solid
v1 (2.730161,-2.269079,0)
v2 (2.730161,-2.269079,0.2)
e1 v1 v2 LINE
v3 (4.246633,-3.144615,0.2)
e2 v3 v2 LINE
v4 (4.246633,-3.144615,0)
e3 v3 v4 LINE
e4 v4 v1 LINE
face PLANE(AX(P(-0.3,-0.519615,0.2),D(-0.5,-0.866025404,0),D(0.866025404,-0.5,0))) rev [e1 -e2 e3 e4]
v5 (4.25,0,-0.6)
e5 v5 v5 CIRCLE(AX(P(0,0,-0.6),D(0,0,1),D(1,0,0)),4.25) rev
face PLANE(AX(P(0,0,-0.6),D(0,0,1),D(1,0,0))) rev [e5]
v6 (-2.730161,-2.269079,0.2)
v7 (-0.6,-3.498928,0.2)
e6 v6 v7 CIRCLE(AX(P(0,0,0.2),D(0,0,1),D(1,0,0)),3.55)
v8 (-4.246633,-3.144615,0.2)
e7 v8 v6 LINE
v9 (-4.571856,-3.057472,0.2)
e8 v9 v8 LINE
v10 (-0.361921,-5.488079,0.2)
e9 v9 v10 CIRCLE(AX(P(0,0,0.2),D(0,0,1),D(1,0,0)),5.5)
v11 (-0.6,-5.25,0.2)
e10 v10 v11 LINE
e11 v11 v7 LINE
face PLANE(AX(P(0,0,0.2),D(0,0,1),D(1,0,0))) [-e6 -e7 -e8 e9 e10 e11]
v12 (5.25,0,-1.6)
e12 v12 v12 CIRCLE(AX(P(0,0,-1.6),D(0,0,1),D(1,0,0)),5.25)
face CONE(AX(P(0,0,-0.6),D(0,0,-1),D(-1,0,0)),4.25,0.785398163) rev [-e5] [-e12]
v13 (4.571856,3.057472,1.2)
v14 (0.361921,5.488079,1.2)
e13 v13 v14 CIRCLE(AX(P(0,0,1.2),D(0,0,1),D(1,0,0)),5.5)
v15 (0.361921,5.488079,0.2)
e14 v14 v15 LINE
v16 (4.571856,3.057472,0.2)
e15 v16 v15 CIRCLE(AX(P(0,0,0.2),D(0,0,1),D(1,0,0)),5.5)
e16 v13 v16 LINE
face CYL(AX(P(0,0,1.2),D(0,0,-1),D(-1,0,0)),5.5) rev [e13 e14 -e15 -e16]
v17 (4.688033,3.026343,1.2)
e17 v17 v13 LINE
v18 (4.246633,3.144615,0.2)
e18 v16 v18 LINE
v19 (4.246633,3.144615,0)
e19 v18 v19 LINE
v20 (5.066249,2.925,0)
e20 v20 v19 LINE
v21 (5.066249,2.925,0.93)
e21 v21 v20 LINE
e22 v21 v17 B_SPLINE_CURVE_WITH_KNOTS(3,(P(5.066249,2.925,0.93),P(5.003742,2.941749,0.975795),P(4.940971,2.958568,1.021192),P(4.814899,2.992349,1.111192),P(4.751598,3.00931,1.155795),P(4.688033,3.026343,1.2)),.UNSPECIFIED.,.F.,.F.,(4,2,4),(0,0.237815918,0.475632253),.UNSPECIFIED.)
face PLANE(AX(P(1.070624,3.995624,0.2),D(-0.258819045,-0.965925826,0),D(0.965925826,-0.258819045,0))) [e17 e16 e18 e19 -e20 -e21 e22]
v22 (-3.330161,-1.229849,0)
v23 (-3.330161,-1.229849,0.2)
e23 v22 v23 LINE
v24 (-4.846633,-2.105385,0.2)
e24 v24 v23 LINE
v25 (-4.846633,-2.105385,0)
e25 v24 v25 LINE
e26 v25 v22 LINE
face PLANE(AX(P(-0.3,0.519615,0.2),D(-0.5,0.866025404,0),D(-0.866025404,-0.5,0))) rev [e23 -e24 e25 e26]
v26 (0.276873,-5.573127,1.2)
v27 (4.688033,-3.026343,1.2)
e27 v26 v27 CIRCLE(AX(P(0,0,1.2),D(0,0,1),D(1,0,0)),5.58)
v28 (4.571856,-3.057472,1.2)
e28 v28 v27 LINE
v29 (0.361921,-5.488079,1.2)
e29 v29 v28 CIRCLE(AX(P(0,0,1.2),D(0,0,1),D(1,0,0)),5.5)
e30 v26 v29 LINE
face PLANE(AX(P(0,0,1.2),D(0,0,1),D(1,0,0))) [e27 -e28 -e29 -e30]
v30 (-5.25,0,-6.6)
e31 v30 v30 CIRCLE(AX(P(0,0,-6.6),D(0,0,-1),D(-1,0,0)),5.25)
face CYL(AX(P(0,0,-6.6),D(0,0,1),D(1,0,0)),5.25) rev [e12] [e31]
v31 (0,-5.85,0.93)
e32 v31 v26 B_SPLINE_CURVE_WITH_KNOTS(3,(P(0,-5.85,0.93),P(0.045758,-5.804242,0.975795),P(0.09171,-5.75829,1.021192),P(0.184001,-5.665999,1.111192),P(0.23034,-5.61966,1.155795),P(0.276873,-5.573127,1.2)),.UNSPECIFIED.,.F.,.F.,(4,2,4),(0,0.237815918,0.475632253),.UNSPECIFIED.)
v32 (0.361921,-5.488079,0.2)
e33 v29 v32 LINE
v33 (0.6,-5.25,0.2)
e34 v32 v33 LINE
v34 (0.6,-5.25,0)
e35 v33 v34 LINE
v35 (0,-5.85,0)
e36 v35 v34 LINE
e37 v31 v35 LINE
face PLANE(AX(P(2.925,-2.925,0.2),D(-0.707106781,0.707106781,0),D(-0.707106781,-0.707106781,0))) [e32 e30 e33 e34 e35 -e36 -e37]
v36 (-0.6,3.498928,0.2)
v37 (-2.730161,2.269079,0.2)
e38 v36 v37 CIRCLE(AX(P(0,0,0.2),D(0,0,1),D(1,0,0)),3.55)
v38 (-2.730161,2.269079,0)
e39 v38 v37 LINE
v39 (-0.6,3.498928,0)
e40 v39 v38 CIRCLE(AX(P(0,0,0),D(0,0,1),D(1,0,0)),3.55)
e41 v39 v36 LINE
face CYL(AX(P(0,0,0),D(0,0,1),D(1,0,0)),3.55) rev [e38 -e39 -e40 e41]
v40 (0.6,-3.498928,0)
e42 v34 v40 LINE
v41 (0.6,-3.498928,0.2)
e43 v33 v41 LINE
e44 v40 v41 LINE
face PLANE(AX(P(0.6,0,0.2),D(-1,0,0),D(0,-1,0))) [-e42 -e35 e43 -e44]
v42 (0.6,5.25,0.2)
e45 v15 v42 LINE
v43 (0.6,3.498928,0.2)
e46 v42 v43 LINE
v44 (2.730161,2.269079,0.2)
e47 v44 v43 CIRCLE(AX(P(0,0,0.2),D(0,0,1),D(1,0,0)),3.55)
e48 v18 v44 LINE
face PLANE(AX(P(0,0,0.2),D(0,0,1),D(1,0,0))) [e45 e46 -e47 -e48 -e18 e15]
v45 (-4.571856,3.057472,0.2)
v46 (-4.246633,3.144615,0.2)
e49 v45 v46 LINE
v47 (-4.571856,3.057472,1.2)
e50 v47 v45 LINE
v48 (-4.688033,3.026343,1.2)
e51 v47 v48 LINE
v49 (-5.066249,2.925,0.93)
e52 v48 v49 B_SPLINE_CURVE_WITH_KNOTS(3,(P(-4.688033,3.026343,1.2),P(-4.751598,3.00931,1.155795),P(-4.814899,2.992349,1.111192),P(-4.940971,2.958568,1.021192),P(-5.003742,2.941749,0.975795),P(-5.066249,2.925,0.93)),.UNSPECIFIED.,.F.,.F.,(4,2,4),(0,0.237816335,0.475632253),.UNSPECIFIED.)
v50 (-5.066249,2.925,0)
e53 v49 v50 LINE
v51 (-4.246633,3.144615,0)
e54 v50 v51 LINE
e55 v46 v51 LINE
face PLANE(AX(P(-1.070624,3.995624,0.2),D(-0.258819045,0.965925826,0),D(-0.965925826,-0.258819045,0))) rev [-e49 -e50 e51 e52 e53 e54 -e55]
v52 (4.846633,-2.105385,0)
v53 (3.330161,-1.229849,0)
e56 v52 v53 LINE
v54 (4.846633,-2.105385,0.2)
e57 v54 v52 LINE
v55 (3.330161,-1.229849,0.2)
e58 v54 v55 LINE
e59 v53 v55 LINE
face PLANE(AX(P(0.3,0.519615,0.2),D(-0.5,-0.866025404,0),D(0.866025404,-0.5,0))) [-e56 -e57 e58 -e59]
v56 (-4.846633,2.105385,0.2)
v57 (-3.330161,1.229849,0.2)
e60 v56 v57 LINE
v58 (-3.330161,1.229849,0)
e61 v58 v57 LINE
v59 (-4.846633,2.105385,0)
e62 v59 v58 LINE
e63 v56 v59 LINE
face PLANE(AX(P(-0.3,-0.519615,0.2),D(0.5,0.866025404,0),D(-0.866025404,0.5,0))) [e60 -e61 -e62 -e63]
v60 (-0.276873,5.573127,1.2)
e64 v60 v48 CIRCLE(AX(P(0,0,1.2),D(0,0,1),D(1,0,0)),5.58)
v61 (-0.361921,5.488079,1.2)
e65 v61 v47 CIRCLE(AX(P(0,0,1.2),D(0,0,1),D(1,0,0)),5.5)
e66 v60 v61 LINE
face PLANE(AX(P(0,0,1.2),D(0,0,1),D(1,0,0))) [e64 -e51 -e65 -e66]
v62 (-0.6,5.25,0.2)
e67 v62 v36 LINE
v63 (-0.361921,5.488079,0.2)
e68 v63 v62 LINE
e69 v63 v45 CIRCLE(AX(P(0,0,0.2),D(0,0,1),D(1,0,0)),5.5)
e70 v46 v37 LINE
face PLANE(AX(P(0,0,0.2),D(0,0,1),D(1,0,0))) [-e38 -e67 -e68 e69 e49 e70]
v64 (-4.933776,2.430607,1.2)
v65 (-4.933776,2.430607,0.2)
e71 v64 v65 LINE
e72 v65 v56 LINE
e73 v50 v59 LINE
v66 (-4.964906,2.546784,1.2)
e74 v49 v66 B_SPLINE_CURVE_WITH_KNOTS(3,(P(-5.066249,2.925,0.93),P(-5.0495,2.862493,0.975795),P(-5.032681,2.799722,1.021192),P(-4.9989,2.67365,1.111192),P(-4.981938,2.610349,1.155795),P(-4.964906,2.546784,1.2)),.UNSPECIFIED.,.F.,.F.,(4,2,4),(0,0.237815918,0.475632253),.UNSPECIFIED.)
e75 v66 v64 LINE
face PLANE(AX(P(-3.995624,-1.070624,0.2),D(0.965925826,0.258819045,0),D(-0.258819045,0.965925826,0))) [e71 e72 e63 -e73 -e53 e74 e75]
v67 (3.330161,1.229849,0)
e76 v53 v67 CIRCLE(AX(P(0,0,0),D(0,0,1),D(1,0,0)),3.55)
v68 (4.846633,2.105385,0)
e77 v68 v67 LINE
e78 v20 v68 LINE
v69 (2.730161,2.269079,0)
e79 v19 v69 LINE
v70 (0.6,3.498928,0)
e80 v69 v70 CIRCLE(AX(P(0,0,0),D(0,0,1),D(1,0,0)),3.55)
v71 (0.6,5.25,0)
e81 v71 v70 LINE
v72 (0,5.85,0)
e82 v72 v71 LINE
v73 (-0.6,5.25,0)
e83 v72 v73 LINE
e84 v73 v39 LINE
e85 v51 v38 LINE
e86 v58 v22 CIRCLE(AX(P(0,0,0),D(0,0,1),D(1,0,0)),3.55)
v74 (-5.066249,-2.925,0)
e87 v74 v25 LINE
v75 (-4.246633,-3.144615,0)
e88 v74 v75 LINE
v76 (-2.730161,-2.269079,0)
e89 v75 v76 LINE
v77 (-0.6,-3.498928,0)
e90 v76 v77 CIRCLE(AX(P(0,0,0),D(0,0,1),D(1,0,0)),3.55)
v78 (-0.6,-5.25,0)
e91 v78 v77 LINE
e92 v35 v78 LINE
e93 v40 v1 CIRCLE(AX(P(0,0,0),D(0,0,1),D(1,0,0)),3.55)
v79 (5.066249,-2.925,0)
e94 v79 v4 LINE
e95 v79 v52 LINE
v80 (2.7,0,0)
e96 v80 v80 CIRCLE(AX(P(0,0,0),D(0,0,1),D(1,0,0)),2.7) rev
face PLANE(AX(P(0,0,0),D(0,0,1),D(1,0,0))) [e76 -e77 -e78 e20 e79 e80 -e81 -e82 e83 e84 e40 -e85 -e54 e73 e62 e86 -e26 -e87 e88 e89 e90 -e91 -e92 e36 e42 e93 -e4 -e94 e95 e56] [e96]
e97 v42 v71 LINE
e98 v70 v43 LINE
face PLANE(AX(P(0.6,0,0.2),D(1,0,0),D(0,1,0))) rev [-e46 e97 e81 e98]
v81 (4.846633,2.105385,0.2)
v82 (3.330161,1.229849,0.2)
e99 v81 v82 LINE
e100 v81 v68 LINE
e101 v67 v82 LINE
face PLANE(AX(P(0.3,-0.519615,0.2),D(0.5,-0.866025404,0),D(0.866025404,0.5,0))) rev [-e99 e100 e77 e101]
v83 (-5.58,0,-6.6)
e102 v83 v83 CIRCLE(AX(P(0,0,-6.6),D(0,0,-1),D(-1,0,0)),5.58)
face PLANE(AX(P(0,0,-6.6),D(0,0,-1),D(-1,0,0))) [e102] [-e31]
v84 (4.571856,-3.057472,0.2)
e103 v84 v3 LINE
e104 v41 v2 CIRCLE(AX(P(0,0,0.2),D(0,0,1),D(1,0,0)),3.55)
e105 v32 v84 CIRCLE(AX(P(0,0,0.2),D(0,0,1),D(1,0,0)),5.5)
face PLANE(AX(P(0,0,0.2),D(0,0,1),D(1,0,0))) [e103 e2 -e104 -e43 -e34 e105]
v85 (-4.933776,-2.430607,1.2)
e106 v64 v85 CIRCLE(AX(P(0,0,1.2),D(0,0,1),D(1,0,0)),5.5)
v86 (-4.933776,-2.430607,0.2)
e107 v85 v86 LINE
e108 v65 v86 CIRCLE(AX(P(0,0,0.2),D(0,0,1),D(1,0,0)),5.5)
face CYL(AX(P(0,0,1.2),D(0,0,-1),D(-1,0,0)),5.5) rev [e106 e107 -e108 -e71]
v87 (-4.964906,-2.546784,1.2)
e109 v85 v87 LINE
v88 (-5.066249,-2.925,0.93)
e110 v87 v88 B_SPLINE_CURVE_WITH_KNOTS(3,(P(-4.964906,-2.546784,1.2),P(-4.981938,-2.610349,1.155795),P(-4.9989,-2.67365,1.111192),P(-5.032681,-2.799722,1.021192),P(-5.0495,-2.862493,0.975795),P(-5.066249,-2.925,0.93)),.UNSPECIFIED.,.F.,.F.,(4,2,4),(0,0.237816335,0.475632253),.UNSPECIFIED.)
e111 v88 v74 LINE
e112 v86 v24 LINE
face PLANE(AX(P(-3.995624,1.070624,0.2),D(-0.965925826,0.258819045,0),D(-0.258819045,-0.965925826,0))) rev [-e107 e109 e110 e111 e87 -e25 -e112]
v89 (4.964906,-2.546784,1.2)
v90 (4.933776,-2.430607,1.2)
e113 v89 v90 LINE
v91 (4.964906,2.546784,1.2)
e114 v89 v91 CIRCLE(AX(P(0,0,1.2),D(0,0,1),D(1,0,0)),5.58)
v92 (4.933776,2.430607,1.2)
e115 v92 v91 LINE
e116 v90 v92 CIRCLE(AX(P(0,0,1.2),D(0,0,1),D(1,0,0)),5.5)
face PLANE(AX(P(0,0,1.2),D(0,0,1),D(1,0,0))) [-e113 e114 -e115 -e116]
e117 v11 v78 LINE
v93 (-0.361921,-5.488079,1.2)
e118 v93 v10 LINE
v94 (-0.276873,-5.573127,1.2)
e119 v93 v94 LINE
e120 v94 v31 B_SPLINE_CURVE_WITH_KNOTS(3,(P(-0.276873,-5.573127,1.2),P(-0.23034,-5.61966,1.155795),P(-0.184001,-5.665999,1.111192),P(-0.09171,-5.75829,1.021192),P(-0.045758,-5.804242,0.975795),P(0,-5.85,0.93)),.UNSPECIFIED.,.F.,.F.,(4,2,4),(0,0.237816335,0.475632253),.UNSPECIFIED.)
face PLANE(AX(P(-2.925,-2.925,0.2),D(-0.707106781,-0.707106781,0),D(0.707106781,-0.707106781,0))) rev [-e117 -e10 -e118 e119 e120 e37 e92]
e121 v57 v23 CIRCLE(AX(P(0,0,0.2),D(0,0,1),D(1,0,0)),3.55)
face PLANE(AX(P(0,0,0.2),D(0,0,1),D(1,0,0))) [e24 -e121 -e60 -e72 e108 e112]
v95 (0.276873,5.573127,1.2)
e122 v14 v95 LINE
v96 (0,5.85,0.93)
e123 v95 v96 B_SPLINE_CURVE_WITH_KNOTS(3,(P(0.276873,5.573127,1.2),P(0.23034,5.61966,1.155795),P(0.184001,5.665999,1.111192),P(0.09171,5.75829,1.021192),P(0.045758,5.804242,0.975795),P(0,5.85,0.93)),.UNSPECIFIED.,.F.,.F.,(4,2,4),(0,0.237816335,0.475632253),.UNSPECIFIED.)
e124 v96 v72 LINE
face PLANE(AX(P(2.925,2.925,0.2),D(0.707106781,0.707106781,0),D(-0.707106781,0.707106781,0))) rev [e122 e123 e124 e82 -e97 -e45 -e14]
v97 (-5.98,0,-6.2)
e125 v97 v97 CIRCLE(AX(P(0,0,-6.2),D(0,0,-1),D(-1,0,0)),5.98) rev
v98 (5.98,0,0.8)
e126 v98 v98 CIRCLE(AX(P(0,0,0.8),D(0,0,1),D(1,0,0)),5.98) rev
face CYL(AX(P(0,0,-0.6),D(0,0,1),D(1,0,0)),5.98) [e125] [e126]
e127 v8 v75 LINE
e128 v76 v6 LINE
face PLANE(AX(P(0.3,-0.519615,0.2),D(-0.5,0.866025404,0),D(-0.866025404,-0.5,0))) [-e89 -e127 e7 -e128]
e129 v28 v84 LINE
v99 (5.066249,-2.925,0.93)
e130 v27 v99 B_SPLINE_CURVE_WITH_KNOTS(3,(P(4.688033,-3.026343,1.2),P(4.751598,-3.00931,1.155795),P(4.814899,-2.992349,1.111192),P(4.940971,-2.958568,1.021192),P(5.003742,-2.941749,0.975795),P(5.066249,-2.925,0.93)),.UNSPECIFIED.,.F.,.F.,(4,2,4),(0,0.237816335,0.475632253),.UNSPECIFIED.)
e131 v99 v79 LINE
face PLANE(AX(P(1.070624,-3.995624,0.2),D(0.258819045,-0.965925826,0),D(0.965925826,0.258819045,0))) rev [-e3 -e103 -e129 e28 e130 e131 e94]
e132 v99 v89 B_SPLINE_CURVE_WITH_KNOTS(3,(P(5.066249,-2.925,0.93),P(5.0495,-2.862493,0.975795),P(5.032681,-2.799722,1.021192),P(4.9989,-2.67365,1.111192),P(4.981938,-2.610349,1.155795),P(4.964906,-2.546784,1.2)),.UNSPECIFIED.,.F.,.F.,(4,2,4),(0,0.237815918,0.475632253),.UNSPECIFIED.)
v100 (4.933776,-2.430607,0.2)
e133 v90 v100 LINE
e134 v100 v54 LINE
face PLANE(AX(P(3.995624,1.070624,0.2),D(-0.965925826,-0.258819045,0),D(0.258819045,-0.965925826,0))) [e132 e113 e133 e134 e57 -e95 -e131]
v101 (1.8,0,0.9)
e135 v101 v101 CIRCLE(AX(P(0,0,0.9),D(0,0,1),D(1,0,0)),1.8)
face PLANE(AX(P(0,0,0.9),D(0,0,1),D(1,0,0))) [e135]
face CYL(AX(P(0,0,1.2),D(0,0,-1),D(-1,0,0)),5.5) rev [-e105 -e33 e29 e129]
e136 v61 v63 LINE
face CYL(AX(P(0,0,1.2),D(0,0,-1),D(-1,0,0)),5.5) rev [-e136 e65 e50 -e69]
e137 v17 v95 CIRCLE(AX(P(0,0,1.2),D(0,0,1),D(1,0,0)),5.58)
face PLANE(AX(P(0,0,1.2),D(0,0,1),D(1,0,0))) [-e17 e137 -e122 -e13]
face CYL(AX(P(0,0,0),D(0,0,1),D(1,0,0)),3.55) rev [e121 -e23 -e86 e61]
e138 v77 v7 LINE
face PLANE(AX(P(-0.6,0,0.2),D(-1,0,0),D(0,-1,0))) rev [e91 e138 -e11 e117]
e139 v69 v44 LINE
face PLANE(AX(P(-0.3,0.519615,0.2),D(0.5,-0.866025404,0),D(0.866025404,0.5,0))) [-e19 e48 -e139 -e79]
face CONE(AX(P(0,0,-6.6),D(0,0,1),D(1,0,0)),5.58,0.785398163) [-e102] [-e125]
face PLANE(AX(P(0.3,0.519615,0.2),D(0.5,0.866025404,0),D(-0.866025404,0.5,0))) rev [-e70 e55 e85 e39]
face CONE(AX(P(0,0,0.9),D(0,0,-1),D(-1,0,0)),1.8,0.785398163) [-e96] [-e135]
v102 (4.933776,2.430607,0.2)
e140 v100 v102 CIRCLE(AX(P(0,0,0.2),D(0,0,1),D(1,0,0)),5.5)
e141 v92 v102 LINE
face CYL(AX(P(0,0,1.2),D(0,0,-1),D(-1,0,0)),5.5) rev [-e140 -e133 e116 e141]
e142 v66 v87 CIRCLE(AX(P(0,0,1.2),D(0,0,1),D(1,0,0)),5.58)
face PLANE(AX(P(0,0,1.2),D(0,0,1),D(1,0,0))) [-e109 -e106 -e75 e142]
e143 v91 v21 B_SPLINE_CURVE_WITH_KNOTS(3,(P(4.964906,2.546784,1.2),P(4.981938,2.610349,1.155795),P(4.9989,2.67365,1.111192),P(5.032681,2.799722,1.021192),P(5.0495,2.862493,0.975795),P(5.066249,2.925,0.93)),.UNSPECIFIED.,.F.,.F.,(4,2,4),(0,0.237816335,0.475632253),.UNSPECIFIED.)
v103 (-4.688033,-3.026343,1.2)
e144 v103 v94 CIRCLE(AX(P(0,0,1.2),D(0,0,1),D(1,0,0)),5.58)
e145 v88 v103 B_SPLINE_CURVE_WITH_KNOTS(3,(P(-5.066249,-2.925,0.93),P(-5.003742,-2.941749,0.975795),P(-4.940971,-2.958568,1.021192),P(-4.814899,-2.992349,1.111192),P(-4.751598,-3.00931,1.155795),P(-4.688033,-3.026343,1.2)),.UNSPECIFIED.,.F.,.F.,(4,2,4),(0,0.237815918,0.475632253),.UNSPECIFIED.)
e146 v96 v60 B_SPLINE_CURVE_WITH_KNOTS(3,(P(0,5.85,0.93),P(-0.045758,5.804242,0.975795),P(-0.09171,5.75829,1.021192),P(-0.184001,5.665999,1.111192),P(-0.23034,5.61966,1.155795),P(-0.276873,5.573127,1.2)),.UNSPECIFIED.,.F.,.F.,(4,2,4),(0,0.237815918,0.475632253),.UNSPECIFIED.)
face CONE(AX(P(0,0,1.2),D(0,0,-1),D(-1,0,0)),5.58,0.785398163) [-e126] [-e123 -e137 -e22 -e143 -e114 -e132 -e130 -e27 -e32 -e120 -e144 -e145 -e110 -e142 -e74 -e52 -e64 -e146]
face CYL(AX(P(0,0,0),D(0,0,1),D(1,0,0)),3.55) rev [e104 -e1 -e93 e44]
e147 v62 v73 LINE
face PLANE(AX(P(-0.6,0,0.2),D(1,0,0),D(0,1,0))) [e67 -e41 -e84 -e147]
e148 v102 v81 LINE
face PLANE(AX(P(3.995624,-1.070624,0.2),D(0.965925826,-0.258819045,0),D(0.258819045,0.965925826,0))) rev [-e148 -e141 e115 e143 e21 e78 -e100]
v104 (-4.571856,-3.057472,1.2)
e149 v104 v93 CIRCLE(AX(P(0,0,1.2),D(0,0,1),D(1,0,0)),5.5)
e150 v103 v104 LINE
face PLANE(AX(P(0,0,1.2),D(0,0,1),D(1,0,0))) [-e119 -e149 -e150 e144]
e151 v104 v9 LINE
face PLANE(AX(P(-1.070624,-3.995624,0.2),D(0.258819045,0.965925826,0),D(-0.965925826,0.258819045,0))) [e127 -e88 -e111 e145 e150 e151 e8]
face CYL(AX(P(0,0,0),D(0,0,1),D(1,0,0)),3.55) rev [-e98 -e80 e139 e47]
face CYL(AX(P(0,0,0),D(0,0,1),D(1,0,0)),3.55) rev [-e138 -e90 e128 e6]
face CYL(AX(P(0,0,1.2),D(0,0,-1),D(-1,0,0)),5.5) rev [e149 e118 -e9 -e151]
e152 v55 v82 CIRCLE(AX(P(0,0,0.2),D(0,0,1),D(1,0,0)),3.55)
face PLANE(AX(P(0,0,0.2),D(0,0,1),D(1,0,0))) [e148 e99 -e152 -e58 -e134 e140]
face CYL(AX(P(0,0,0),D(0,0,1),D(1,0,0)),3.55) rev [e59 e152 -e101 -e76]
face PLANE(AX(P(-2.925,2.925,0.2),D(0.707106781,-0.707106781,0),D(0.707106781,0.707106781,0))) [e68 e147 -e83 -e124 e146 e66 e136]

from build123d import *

# Parameters (mm, degrees)
SKETCH_1_R          = 5.98
EXTRUDE_1_DEPTH     = 0.2
SKETCH_2_R          = 2.8
EXTRUDE_2_DEPTH     = 0.9
SKETCH_3_R          = 5.98
EXTRUDE_3_DEPTH     = 1
EXTRUDE_START       = -0.6
SKETCH_4_R          = 5.98
EXTRUDE_4_DEPTH     = 0.6
CUT_EXTRUDE_START   = -0.2
SKETCH_6_R          = 3.55
SKETCH_6_R_2        = 2.8
CUT_EXTRUDE_2_DEPTH = 0.2
EXTRUDE_START_2     = 6
SKETCH_7_R          = 5.98
SKETCH_7_R_2        = 5.25
EXTRUDE_5_DEPTH     = 6
CHAMFER_4_SIZE      = 1
CHAMFER_5_SIZE      = 0.4
CHAMFER_6_SIZE      = 0.4
CHAMFER_7_SIZE      = 1


with BuildPart() as part:
    # 스케치1 → 보스-돌출1 (new body)
    with BuildSketch(Plane.XY):
        Circle(SKETCH_1_R)
        with BuildLine():
            Line((-0.6, 5.25), (0, 5.85))
            Line((0, 5.85), (0.6, 5.25))
            Line((0.6, 5.25), (0.6, 1.670516387))
            ThreePointArc((0.6, 1.670516387), (0.8875, 1.537195092), (1.146709629, 1.354873436))
            Line((1.146709629, 1.354873436), (4.24663337, 3.144615242))
            Line((4.24663337, 3.144615242), (5.066248612, 2.925))
            Line((5.066248612, 2.925), (4.84663337, 2.105384758))
            Line((4.84663337, 2.105384758), (1.746709629, 0.315642951))
            ThreePointArc((1.746709629, 0.315642951), (1.76791326, 0.158454108), (1.775, 0))
            ThreePointArc((1.775, 0), (1.76791326, -0.158454108), (1.746709629, -0.315642951))
            Line((1.746709629, -0.315642951), (4.84663337, -2.105384758))
            Line((4.84663337, -2.105384758), (5.066248612, -2.925))
            Line((5.066248612, -2.925), (4.24663337, -3.144615242))
            Line((4.24663337, -3.144615242), (1.146709629, -1.354873436))
            ThreePointArc((1.146709629, -1.354873436), (0.8875, -1.537195092), (0.6, -1.670516387))
            Line((0.6, -1.670516387), (0.6, -5.25))
            Line((0.6, -5.25), (0, -5.85))
            Line((0, -5.85), (-0.6, -5.25))
            Line((-0.6, -5.25), (-0.6, -1.670516387))
            ThreePointArc((-0.6, -1.670516387), (-0.8875, -1.537195092), (-1.146709629, -1.354873436))
            Line((-1.146709629, -1.354873436), (-4.24663337, -3.144615242))
            Line((-4.24663337, -3.144615242), (-5.066248612, -2.925))
            Line((-5.066248612, -2.925), (-4.84663337, -2.105384758))
            Line((-4.84663337, -2.105384758), (-1.746709629, -0.315642951))
            ThreePointArc((-1.746709629, -0.315642951), (-1.775, 0), (-1.746709629, 0.315642951))
            Line((-1.746709629, 0.315642951), (-4.84663337, 2.105384758))
            Line((-4.84663337, 2.105384758), (-5.066248612, 2.925))
            Line((-5.066248612, 2.925), (-4.24663337, 3.144615242))
            Line((-4.24663337, 3.144615242), (-1.146709629, 1.354873436))
            ThreePointArc((-1.146709629, 1.354873436), (-0.8875, 1.537195092), (-0.6, 1.670516387))
            Line((-0.6, 1.670516387), (-0.6, 5.25))
        make_face(mode=Mode.SUBTRACT)
    extrude(amount=EXTRUDE_1_DEPTH)

    # 스케치3 → 보스-돌출3 (add)
    with BuildSketch(Plane.XY.offset(0.2)):
        Circle(SKETCH_3_R)
        with BuildLine():
            Line((-4.933776406, -2.430606997), (-5.066248612, -2.925))
            Line((-5.066248612, -2.925), (-4.571855609, -3.057472206))
            ThreePointArc((-4.571855609, -3.057472206), (-2.75, -4.763139721), (-0.361920797, -5.488079203))
            Line((-0.361920797, -5.488079203), (0, -5.85))
            Line((0, -5.85), (0.361920797, -5.488079203))
            ThreePointArc((0.361920797, -5.488079203), (2.75, -4.763139721), (4.571855609, -3.057472206))
            Line((4.571855609, -3.057472206), (5.066248612, -2.925))
            Line((5.066248612, -2.925), (4.933776406, -2.430606997))
            ThreePointArc((4.933776406, -2.430606997), (5.5, 0), (4.933776406, 2.430606997))
            Line((4.933776406, 2.430606997), (5.066248612, 2.925))
            Line((5.066248612, 2.925), (4.571855609, 3.057472206))
            ThreePointArc((4.571855609, 3.057472206), (2.75, 4.763139721), (0.361920797, 5.488079203))
            Line((0.361920797, 5.488079203), (0, 5.85))
            Line((0, 5.85), (-0.361920797, 5.488079203))
            ThreePointArc((-0.361920797, 5.488079203), (-2.75, 4.763139721), (-4.571855609, 3.057472206))
            Line((-4.571855609, 3.057472206), (-5.066248612, 2.925))
            Line((-5.066248612, 2.925), (-4.933776406, 2.430606997))
            ThreePointArc((-4.933776406, 2.430606997), (-5.5, 0), (-4.933776406, -2.430606997))
        make_face(mode=Mode.SUBTRACT)
    extrude(amount=EXTRUDE_3_DEPTH)



with BuildPart() as body_2:
    # 스케치2 → 보스-돌출2 (new body)
    with BuildSketch(Plane.XY):
        Circle(SKETCH_2_R)
    extrude(amount=EXTRUDE_2_DEPTH)


with BuildPart() as part_1:
    add(part.part)

    add(body_2.part)  # 보스-돌출4 merges body 2
    # 스케치4 → 보스-돌출4 (add)
    with BuildSketch(Plane.XY.offset(EXTRUDE_START)):
        Circle(SKETCH_4_R)
    extrude(amount=EXTRUDE_4_DEPTH)

    # 스케치6 → 컷-돌출2 (cut)
    with BuildSketch(Plane.XY.offset(0.2).offset(CUT_EXTRUDE_START)):
        Circle(SKETCH_6_R)
        Circle(SKETCH_6_R_2, mode=Mode.SUBTRACT)
    extrude(amount=CUT_EXTRUDE_2_DEPTH, mode=Mode.SUBTRACT)

    # 스케치7 → 보스-돌출5 (add)
    with BuildSketch(Plane(origin=(0, 0, -0.6), x_dir=(-1, 0, 0), z_dir=(0, 0, -1)).offset(EXTRUDE_START_2)):
        with Locations(Location((0, 0, 0), (0, 0, 180))):
            Circle(SKETCH_7_R)
        Circle(SKETCH_7_R_2, mode=Mode.SUBTRACT)
    extrude(amount=-EXTRUDE_5_DEPTH)

    # 모따기4
    chamfer_4_edges = [part_1.edges().sort_by_distance(p)[0] for p in [
        (5.25, 0, -0.6),
    ]]
    chamfer(chamfer_4_edges, length=CHAMFER_4_SIZE)

    # 모따기5
    # the kernel refuses this chamfer: 0.4 mm, written as the material it takes off along each edge
    with BuildSketch(Plane(origin=(0, 0, 1.2), x_dir=(1, 0, 0), z_dir=(0, -1, 0))) as chamfer_5_piece_1:
        Polygon((5.98, -CHAMFER_5_SIZE), (5.98 - CHAMFER_5_SIZE, 0), (5.98, 0), align=None)
    revolve(axis=Axis((0, 0, 1.2), (0, 0, 1)), mode=Mode.SUBTRACT)

    # 모따기6
    chamfer_6_edges = [part_1.edges().sort_by_distance(p)[0] for p in [
        (-5.98, 0, -6.6),
    ]]
    chamfer(chamfer_6_edges, length=CHAMFER_6_SIZE)

    # 모따기7
    # the kernel refuses this chamfer: 1 mm, written as the material it takes off along each edge
    with BuildSketch(Plane(origin=(0, 0, 0.9), x_dir=(1, 0, 0), z_dir=(0, -1, 0))) as chamfer_7_piece_1_section:
        Polygon((2.8, -CHAMFER_7_SIZE), (2.8 - CHAMFER_7_SIZE, 0), (2.8, 0), align=None)
    chamfer_7_piece_1 = revolve(axis=Axis((0, 0, 0.9), (0, 0, 1)), mode=Mode.PRIVATE)
    chamfer_7_piece_1 = split(chamfer_7_piece_1, bisect_by=Plane(origin=(-2.250209939, 0, 0), z_dir=(0, 0, 1)), keep=Keep.TOP, mode=Mode.PRIVATE)
    add(chamfer_7_piece_1, mode=Mode.SUBTRACT)


solid = part_1.part
